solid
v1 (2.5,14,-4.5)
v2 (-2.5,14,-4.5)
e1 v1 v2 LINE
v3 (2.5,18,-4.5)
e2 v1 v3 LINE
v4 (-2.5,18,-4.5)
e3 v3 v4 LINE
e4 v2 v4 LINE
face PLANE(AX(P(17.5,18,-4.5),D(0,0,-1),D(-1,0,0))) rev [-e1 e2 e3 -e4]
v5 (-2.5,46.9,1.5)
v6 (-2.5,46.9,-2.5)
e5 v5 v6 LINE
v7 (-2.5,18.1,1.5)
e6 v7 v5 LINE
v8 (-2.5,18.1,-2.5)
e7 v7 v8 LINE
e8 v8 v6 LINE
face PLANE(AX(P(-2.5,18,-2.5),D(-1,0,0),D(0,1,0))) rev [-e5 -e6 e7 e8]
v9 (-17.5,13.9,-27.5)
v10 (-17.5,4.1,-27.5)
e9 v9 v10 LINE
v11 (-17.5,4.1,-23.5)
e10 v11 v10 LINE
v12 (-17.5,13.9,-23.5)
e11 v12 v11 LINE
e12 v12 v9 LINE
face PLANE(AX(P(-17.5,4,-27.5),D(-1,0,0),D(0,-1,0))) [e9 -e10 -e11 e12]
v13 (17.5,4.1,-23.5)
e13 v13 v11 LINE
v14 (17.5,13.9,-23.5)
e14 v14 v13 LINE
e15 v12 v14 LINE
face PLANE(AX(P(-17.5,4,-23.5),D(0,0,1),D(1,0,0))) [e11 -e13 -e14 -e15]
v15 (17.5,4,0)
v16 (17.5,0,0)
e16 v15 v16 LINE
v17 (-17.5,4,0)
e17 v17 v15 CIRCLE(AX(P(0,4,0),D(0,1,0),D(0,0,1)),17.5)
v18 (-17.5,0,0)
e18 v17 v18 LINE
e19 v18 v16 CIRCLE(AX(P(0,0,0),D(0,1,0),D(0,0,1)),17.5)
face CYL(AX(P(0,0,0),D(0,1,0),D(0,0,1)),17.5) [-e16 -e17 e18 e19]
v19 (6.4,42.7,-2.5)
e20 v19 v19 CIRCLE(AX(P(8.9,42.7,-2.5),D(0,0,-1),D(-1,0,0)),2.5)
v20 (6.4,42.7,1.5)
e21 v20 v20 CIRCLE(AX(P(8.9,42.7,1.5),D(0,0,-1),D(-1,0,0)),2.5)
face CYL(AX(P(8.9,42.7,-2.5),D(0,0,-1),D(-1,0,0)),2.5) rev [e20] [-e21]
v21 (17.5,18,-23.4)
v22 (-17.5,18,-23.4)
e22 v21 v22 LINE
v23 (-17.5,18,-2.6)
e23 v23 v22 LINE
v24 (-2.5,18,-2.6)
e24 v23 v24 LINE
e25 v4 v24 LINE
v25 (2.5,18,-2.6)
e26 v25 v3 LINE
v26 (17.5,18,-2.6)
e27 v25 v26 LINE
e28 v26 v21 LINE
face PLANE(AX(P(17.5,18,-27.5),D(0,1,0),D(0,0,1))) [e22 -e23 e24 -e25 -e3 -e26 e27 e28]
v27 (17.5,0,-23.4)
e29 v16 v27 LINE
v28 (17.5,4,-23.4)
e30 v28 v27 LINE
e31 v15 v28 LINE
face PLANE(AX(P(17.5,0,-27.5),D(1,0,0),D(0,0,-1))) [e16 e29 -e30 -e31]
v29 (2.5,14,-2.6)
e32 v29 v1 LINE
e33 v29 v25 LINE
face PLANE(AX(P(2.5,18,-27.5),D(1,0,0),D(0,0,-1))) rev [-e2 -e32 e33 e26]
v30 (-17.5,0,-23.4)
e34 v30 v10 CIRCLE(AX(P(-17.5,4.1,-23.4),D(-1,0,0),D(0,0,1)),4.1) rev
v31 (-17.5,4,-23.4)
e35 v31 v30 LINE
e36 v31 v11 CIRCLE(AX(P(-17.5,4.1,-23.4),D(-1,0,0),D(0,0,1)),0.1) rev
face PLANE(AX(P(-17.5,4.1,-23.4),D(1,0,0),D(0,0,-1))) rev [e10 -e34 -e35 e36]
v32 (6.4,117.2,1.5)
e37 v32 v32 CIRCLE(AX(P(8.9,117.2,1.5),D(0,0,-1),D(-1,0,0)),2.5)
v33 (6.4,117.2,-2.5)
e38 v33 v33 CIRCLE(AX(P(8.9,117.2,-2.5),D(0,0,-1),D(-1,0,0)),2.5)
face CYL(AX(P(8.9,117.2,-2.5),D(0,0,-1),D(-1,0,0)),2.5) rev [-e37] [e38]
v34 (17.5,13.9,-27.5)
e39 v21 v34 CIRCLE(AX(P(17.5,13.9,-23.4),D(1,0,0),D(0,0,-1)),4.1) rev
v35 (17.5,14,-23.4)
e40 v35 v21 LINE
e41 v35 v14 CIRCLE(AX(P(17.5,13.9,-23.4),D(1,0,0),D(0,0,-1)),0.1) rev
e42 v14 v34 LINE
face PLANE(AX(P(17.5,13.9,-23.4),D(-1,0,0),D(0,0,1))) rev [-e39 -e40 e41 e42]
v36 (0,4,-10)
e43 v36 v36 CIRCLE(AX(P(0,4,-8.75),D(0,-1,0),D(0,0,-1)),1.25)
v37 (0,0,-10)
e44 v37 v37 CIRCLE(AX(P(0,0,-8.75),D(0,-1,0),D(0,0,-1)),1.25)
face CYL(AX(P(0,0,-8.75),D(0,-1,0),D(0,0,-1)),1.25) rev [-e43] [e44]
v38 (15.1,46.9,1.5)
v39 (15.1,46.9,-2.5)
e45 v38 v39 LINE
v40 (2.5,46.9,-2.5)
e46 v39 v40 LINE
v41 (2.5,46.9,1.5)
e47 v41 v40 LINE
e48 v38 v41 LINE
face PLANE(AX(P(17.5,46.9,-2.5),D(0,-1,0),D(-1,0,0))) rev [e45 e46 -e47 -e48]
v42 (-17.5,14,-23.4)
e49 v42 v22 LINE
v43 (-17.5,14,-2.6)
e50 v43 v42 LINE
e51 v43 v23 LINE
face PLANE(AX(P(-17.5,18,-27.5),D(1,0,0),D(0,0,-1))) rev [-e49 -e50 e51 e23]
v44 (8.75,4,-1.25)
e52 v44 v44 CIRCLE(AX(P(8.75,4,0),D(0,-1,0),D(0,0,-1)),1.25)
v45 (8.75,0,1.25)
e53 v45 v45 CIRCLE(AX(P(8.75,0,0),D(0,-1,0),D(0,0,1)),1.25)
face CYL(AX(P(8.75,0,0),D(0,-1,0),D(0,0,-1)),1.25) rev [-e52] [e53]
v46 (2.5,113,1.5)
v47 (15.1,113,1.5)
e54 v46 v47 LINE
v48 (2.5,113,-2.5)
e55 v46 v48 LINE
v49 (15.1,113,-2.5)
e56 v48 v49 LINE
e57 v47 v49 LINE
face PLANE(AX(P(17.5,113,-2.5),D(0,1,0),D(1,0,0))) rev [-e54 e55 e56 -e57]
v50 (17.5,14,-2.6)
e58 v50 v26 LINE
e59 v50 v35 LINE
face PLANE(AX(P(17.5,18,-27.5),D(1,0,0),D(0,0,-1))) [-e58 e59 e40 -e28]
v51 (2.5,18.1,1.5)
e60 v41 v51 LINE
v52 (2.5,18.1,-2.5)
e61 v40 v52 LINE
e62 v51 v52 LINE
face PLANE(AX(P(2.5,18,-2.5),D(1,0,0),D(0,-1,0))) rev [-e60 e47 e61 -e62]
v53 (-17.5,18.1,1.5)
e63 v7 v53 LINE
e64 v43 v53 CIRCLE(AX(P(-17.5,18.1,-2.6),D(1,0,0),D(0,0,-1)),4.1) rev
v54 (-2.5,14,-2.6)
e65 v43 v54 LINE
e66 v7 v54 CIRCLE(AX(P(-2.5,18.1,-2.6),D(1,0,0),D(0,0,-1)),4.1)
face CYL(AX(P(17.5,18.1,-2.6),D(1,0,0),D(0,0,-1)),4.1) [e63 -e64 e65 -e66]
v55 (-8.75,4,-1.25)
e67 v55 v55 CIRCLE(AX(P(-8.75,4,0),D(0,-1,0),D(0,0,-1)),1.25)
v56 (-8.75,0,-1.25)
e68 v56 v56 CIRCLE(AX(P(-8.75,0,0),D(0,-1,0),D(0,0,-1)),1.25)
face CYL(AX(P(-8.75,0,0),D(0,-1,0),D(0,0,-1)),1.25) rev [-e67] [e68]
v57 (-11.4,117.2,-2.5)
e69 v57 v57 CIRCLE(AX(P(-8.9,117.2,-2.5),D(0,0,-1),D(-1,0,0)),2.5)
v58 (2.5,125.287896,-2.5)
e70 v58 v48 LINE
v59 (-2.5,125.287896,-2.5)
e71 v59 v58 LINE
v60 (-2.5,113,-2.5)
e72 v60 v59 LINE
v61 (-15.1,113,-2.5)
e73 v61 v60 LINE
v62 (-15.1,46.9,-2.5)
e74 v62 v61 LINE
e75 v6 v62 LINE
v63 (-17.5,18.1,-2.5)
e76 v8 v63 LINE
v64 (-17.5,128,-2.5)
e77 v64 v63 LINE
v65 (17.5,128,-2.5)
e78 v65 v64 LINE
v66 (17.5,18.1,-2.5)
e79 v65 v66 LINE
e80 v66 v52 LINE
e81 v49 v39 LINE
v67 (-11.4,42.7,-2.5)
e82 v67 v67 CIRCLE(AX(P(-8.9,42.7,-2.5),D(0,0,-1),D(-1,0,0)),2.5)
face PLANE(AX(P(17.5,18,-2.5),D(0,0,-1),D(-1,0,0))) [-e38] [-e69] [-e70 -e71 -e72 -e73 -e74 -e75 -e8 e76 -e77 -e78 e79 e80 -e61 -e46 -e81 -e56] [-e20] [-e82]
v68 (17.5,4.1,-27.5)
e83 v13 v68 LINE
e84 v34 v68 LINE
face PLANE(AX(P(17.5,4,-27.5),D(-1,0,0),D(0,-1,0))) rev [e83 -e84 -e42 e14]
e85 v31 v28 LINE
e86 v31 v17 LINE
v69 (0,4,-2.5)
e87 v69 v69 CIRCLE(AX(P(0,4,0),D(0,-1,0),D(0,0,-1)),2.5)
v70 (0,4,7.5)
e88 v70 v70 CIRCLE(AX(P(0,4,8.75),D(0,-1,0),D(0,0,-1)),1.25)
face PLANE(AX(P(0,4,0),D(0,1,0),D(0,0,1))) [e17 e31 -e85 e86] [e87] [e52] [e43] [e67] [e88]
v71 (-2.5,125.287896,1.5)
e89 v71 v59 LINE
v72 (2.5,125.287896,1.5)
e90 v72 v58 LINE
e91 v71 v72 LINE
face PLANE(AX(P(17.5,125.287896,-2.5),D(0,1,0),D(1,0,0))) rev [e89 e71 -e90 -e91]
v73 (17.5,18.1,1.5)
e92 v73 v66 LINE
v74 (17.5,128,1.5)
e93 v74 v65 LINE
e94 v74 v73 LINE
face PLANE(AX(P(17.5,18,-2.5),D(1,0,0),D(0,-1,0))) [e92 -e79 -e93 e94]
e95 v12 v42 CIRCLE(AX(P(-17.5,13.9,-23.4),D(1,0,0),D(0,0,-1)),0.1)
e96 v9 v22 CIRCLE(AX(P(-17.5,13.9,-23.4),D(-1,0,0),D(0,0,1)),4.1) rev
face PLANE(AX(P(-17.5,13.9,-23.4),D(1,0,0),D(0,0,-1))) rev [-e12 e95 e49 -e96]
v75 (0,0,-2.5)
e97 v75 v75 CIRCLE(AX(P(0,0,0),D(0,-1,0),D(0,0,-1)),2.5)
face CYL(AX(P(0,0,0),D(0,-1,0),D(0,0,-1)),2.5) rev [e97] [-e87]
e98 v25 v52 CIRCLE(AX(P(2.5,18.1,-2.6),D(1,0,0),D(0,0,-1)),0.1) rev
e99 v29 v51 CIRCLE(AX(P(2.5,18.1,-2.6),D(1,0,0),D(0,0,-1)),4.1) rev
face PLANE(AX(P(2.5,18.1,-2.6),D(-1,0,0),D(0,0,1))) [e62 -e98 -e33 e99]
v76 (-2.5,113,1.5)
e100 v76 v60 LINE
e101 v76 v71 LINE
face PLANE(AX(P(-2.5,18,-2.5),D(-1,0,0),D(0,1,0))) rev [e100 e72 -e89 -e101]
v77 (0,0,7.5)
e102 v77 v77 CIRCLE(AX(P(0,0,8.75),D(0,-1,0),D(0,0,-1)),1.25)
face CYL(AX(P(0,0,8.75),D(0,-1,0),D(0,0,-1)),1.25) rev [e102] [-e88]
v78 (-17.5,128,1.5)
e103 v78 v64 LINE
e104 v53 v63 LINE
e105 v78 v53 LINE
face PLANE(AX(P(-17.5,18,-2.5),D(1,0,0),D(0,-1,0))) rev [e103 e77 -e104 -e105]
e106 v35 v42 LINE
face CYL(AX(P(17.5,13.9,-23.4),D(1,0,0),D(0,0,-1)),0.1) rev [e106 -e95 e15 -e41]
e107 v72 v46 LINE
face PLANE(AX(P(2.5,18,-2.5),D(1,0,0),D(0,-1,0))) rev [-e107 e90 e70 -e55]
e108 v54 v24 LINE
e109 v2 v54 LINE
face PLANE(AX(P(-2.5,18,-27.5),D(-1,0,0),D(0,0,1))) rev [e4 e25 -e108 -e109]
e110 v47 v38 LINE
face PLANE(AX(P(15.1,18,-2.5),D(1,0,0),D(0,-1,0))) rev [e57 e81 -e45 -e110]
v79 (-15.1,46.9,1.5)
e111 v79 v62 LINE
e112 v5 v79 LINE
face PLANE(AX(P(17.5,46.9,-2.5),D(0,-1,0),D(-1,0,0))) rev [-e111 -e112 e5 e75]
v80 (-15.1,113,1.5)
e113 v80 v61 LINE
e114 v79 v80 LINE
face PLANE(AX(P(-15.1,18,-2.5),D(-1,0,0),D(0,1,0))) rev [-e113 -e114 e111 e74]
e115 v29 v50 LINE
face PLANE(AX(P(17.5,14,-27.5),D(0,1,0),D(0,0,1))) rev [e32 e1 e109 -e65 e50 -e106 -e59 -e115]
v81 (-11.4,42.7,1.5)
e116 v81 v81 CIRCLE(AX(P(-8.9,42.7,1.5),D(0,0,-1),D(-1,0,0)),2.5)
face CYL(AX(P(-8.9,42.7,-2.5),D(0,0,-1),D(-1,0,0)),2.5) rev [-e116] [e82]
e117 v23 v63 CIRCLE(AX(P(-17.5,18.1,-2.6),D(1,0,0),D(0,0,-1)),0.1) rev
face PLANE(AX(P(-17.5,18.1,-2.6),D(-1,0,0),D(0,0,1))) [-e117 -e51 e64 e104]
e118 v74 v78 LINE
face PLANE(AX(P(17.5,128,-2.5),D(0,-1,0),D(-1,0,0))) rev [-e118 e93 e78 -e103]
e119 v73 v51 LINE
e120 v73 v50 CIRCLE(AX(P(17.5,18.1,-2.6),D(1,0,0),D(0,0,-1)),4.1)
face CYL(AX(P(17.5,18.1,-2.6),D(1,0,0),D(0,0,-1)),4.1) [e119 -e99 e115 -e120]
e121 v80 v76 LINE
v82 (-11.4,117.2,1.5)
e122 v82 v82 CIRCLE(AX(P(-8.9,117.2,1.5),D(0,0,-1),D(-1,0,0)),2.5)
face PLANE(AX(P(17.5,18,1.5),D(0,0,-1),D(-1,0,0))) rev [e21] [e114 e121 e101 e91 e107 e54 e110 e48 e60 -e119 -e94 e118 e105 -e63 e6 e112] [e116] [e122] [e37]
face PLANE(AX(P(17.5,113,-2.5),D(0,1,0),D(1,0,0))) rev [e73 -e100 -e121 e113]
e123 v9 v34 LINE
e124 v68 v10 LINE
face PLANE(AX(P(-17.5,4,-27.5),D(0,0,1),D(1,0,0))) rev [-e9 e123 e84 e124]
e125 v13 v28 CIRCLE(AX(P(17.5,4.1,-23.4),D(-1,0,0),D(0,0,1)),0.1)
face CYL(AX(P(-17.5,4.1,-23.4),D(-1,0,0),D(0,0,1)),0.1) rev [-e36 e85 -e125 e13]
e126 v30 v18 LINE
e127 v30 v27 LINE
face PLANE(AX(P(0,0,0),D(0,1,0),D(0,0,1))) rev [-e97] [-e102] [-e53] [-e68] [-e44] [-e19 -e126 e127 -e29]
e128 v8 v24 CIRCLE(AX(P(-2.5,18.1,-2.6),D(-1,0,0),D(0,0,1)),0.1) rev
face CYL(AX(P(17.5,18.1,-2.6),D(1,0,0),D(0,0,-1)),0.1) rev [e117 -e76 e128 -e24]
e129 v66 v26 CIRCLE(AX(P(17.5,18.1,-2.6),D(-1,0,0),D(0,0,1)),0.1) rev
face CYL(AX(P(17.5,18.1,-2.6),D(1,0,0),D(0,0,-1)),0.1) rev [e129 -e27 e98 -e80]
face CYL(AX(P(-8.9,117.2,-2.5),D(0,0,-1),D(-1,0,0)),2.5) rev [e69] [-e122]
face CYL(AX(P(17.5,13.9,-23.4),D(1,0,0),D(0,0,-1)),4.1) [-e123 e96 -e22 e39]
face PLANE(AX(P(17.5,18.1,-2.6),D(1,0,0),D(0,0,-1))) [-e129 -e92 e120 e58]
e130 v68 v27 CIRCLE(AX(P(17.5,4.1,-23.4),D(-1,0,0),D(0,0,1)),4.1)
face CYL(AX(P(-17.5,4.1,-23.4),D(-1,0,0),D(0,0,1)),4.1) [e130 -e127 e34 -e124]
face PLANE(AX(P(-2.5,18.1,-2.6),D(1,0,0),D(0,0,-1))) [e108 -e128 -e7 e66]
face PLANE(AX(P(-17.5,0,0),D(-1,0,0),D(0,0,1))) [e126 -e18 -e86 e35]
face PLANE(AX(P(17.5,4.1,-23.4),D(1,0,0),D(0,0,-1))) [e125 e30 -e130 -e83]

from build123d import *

# Parameters (mm, degrees)
BOSS_EXTRUDE2_DEPTH    = 4
SKETCH4_W              = 35
SKETCH4_H              = 4
BOSS_EXTRUDE3_DEPTH    = 10
BOSS_EXTRUDE4_DEPTH    = 35
SKETCH9_R              = 2.5
CUT_EXTRUDE1_DEPTH     = 6
SKETCH10_R             = 1.25
CUT_EXTRUDE2_DEPTH     = 6
SKETCH11_R             = 2.5
CUT_EXTRUDE3_DEPTH     = 4
CONVERT_SOLID2_START   = -17.5
CONVERT_SOLID2_DEPTH   = 35
CONVERT_SOLID2_2_DEPTH = 35
CONVERT_SOLID2_3_DEPTH = 15
CONVERT_SOLID2_START_2 = 2.5
CONVERT_SOLID2_4_DEPTH = 15


# Read off the part's stored shape, not the designer's step: Convert-Solid2
with BuildPart() as part:
    # Sketch3 → Boss-Extrude2 (new body)
    with BuildSketch(Plane(origin=(0, 0, 0), x_dir=(1, 0, 0), z_dir=(0, 1, 0))):
        with BuildLine():
            Line((-17.5, 0), (-17.5, 27.5))
            Line((-17.5, 27.5), (17.5, 27.5))
            Line((17.5, 27.5), (17.5, 0))
            ThreePointArc((17.5, 0), (0, -17.5), (-17.5, 0))
        make_face()
    extrude(amount=BOSS_EXTRUDE2_DEPTH)

    # Sketch4 → Boss-Extrude3 (add)
    with BuildSketch(Plane(origin=(0, 4, 0), x_dir=(1, 0, 0), z_dir=(0, 1, 0))):
        with Locations((0, 25.5)):
            Rectangle(SKETCH4_W, SKETCH4_H)
    extrude(amount=BOSS_EXTRUDE3_DEPTH)

    # Sketch6 → Boss-Extrude4 (add)
    with BuildSketch(Plane.ZY.offset(17.5)):
        Polygon((-27.5, 14), (-27.5, 18), (-2.5, 18), (-2.5, 128), (1.5, 128), (1.5, 14), align=None)
    extrude(amount=-BOSS_EXTRUDE4_DEPTH)

    # Sketch9 → Cut-Extrude1 (cut)
    with BuildSketch(Plane.XY.offset(1.5)):
        with Locations((-8.9, 117.2)):
            Circle(SKETCH9_R)
        with Locations(Location((8.9, 117.2, 0), (0, 0, 180))):
            Circle(SKETCH9_R)
        with Locations(Location((-8.9, 42.7, 0), (0, 0, 180))):
            Circle(SKETCH9_R)
        with Locations((8.9, 42.7)):
            Circle(SKETCH9_R)
        Polygon((-15.1, 113), (-2.5, 113), (-2.5, 125.287895972), (0, 125.287895972), (2.5, 125.287895972), (2.5, 113), (15.1, 113), (15.1, 46.9), (2.5, 46.9), (2.5, 10), (-2.5, 10), (-2.5, 46.9), (-15.1, 46.9), align=None)
    extrude(amount=-CUT_EXTRUDE1_DEPTH, mode=Mode.SUBTRACT)

    # Sketch10 → Cut-Extrude2 (cut)
    with BuildSketch(Plane.XZ):
        with Locations(Location((-8.75, 0, 0), (0, 0, 270))):
            Circle(SKETCH10_R)
        with Locations(Location((8.75, 0, 0), (0, 0, 90))):
            Circle(SKETCH10_R)
        with Locations(Location((0, 8.75, 0), (0, 0, 270))):
            Circle(SKETCH10_R)
        with Locations(Location((0, -8.75, 0), (0, 0, 270))):
            Circle(SKETCH10_R)
    extrude(amount=-CUT_EXTRUDE2_DEPTH, mode=Mode.SUBTRACT)

    # Sketch11 → Cut-Extrude3 (cut)
    with BuildSketch(Plane.XZ):
        with Locations(Location((0, 0, 0), (0, 0, 270))):
            Circle(SKETCH11_R)
    extrude(amount=-CUT_EXTRUDE3_DEPTH, mode=Mode.SUBTRACT)

    # Convert-Solid2 outline → Convert-Solid2 (cut)
    with BuildSketch(Plane.YZ.offset(CONVERT_SOLID2_START)):
        with BuildLine():
            Line((0, -27.5), (4.1, -27.5))
            ThreePointArc((4.1, -27.5), (1.200862197, -26.299137803), (0, -23.4))
            Line((0, -23.4), (0, -27.5))
        make_face()
        with BuildLine():
            Line((18, -27.5), (18, -23.4))
            ThreePointArc((18, -23.4), (16.799137803, -26.299137803), (13.9, -27.5))
            Line((13.9, -27.5), (18, -27.5))
        make_face()
        with BuildLine():
            ThreePointArc((14, -2.6), (15.200862197, 0.299137803), (18.1, 1.5))
            Line((18.1, 1.5), (14, 1.5))
            Line((14, 1.5), (14, -2.6))
        make_face()
    extrude(amount=CONVERT_SOLID2_DEPTH, mode=Mode.SUBTRACT)

    # Convert-Solid2 2 outline → Convert-Solid2 2 (add)
    with BuildSketch(Plane.YZ.offset(CONVERT_SOLID2_START)):
        with BuildLine():
            Line((4, -23.5), (4.1, -23.5))
            ThreePointArc((4.1, -23.5), (4.029289322, -23.470710678), (4, -23.4))
            Line((4, -23.4), (4, -23.5))
        make_face()
        with BuildLine():
            Line((14, -23.5), (14, -23.4))
            ThreePointArc((14, -23.4), (13.970710678, -23.470710678), (13.9, -23.5))
            Line((13.9, -23.5), (14, -23.5))
        make_face()
    extrude(amount=CONVERT_SOLID2_2_DEPTH)

    # Convert-Solid2 3 outline → Convert-Solid2 3 (add)
    with BuildSketch(Plane.YZ.offset(CONVERT_SOLID2_START)):
        with BuildLine():
            ThreePointArc((18, -2.6), (18.029289322, -2.529289322), (18.1, -2.5))
            Line((18.1, -2.5), (18, -2.5))
            Line((18, -2.5), (18, -2.6))
        make_face()
    extrude(amount=CONVERT_SOLID2_3_DEPTH)

    # Convert-Solid2 4 outline → Convert-Solid2 4 (add)
    with BuildSketch(Plane.YZ.offset(CONVERT_SOLID2_START_2)):
        with BuildLine():
            ThreePointArc((18, -2.6), (18.029289322, -2.529289322), (18.1, -2.5))
            Line((18.1, -2.5), (18, -2.5))
            Line((18, -2.5), (18, -2.6))
        make_face()
    extrude(amount=CONVERT_SOLID2_4_DEPTH)


solid = part.part
